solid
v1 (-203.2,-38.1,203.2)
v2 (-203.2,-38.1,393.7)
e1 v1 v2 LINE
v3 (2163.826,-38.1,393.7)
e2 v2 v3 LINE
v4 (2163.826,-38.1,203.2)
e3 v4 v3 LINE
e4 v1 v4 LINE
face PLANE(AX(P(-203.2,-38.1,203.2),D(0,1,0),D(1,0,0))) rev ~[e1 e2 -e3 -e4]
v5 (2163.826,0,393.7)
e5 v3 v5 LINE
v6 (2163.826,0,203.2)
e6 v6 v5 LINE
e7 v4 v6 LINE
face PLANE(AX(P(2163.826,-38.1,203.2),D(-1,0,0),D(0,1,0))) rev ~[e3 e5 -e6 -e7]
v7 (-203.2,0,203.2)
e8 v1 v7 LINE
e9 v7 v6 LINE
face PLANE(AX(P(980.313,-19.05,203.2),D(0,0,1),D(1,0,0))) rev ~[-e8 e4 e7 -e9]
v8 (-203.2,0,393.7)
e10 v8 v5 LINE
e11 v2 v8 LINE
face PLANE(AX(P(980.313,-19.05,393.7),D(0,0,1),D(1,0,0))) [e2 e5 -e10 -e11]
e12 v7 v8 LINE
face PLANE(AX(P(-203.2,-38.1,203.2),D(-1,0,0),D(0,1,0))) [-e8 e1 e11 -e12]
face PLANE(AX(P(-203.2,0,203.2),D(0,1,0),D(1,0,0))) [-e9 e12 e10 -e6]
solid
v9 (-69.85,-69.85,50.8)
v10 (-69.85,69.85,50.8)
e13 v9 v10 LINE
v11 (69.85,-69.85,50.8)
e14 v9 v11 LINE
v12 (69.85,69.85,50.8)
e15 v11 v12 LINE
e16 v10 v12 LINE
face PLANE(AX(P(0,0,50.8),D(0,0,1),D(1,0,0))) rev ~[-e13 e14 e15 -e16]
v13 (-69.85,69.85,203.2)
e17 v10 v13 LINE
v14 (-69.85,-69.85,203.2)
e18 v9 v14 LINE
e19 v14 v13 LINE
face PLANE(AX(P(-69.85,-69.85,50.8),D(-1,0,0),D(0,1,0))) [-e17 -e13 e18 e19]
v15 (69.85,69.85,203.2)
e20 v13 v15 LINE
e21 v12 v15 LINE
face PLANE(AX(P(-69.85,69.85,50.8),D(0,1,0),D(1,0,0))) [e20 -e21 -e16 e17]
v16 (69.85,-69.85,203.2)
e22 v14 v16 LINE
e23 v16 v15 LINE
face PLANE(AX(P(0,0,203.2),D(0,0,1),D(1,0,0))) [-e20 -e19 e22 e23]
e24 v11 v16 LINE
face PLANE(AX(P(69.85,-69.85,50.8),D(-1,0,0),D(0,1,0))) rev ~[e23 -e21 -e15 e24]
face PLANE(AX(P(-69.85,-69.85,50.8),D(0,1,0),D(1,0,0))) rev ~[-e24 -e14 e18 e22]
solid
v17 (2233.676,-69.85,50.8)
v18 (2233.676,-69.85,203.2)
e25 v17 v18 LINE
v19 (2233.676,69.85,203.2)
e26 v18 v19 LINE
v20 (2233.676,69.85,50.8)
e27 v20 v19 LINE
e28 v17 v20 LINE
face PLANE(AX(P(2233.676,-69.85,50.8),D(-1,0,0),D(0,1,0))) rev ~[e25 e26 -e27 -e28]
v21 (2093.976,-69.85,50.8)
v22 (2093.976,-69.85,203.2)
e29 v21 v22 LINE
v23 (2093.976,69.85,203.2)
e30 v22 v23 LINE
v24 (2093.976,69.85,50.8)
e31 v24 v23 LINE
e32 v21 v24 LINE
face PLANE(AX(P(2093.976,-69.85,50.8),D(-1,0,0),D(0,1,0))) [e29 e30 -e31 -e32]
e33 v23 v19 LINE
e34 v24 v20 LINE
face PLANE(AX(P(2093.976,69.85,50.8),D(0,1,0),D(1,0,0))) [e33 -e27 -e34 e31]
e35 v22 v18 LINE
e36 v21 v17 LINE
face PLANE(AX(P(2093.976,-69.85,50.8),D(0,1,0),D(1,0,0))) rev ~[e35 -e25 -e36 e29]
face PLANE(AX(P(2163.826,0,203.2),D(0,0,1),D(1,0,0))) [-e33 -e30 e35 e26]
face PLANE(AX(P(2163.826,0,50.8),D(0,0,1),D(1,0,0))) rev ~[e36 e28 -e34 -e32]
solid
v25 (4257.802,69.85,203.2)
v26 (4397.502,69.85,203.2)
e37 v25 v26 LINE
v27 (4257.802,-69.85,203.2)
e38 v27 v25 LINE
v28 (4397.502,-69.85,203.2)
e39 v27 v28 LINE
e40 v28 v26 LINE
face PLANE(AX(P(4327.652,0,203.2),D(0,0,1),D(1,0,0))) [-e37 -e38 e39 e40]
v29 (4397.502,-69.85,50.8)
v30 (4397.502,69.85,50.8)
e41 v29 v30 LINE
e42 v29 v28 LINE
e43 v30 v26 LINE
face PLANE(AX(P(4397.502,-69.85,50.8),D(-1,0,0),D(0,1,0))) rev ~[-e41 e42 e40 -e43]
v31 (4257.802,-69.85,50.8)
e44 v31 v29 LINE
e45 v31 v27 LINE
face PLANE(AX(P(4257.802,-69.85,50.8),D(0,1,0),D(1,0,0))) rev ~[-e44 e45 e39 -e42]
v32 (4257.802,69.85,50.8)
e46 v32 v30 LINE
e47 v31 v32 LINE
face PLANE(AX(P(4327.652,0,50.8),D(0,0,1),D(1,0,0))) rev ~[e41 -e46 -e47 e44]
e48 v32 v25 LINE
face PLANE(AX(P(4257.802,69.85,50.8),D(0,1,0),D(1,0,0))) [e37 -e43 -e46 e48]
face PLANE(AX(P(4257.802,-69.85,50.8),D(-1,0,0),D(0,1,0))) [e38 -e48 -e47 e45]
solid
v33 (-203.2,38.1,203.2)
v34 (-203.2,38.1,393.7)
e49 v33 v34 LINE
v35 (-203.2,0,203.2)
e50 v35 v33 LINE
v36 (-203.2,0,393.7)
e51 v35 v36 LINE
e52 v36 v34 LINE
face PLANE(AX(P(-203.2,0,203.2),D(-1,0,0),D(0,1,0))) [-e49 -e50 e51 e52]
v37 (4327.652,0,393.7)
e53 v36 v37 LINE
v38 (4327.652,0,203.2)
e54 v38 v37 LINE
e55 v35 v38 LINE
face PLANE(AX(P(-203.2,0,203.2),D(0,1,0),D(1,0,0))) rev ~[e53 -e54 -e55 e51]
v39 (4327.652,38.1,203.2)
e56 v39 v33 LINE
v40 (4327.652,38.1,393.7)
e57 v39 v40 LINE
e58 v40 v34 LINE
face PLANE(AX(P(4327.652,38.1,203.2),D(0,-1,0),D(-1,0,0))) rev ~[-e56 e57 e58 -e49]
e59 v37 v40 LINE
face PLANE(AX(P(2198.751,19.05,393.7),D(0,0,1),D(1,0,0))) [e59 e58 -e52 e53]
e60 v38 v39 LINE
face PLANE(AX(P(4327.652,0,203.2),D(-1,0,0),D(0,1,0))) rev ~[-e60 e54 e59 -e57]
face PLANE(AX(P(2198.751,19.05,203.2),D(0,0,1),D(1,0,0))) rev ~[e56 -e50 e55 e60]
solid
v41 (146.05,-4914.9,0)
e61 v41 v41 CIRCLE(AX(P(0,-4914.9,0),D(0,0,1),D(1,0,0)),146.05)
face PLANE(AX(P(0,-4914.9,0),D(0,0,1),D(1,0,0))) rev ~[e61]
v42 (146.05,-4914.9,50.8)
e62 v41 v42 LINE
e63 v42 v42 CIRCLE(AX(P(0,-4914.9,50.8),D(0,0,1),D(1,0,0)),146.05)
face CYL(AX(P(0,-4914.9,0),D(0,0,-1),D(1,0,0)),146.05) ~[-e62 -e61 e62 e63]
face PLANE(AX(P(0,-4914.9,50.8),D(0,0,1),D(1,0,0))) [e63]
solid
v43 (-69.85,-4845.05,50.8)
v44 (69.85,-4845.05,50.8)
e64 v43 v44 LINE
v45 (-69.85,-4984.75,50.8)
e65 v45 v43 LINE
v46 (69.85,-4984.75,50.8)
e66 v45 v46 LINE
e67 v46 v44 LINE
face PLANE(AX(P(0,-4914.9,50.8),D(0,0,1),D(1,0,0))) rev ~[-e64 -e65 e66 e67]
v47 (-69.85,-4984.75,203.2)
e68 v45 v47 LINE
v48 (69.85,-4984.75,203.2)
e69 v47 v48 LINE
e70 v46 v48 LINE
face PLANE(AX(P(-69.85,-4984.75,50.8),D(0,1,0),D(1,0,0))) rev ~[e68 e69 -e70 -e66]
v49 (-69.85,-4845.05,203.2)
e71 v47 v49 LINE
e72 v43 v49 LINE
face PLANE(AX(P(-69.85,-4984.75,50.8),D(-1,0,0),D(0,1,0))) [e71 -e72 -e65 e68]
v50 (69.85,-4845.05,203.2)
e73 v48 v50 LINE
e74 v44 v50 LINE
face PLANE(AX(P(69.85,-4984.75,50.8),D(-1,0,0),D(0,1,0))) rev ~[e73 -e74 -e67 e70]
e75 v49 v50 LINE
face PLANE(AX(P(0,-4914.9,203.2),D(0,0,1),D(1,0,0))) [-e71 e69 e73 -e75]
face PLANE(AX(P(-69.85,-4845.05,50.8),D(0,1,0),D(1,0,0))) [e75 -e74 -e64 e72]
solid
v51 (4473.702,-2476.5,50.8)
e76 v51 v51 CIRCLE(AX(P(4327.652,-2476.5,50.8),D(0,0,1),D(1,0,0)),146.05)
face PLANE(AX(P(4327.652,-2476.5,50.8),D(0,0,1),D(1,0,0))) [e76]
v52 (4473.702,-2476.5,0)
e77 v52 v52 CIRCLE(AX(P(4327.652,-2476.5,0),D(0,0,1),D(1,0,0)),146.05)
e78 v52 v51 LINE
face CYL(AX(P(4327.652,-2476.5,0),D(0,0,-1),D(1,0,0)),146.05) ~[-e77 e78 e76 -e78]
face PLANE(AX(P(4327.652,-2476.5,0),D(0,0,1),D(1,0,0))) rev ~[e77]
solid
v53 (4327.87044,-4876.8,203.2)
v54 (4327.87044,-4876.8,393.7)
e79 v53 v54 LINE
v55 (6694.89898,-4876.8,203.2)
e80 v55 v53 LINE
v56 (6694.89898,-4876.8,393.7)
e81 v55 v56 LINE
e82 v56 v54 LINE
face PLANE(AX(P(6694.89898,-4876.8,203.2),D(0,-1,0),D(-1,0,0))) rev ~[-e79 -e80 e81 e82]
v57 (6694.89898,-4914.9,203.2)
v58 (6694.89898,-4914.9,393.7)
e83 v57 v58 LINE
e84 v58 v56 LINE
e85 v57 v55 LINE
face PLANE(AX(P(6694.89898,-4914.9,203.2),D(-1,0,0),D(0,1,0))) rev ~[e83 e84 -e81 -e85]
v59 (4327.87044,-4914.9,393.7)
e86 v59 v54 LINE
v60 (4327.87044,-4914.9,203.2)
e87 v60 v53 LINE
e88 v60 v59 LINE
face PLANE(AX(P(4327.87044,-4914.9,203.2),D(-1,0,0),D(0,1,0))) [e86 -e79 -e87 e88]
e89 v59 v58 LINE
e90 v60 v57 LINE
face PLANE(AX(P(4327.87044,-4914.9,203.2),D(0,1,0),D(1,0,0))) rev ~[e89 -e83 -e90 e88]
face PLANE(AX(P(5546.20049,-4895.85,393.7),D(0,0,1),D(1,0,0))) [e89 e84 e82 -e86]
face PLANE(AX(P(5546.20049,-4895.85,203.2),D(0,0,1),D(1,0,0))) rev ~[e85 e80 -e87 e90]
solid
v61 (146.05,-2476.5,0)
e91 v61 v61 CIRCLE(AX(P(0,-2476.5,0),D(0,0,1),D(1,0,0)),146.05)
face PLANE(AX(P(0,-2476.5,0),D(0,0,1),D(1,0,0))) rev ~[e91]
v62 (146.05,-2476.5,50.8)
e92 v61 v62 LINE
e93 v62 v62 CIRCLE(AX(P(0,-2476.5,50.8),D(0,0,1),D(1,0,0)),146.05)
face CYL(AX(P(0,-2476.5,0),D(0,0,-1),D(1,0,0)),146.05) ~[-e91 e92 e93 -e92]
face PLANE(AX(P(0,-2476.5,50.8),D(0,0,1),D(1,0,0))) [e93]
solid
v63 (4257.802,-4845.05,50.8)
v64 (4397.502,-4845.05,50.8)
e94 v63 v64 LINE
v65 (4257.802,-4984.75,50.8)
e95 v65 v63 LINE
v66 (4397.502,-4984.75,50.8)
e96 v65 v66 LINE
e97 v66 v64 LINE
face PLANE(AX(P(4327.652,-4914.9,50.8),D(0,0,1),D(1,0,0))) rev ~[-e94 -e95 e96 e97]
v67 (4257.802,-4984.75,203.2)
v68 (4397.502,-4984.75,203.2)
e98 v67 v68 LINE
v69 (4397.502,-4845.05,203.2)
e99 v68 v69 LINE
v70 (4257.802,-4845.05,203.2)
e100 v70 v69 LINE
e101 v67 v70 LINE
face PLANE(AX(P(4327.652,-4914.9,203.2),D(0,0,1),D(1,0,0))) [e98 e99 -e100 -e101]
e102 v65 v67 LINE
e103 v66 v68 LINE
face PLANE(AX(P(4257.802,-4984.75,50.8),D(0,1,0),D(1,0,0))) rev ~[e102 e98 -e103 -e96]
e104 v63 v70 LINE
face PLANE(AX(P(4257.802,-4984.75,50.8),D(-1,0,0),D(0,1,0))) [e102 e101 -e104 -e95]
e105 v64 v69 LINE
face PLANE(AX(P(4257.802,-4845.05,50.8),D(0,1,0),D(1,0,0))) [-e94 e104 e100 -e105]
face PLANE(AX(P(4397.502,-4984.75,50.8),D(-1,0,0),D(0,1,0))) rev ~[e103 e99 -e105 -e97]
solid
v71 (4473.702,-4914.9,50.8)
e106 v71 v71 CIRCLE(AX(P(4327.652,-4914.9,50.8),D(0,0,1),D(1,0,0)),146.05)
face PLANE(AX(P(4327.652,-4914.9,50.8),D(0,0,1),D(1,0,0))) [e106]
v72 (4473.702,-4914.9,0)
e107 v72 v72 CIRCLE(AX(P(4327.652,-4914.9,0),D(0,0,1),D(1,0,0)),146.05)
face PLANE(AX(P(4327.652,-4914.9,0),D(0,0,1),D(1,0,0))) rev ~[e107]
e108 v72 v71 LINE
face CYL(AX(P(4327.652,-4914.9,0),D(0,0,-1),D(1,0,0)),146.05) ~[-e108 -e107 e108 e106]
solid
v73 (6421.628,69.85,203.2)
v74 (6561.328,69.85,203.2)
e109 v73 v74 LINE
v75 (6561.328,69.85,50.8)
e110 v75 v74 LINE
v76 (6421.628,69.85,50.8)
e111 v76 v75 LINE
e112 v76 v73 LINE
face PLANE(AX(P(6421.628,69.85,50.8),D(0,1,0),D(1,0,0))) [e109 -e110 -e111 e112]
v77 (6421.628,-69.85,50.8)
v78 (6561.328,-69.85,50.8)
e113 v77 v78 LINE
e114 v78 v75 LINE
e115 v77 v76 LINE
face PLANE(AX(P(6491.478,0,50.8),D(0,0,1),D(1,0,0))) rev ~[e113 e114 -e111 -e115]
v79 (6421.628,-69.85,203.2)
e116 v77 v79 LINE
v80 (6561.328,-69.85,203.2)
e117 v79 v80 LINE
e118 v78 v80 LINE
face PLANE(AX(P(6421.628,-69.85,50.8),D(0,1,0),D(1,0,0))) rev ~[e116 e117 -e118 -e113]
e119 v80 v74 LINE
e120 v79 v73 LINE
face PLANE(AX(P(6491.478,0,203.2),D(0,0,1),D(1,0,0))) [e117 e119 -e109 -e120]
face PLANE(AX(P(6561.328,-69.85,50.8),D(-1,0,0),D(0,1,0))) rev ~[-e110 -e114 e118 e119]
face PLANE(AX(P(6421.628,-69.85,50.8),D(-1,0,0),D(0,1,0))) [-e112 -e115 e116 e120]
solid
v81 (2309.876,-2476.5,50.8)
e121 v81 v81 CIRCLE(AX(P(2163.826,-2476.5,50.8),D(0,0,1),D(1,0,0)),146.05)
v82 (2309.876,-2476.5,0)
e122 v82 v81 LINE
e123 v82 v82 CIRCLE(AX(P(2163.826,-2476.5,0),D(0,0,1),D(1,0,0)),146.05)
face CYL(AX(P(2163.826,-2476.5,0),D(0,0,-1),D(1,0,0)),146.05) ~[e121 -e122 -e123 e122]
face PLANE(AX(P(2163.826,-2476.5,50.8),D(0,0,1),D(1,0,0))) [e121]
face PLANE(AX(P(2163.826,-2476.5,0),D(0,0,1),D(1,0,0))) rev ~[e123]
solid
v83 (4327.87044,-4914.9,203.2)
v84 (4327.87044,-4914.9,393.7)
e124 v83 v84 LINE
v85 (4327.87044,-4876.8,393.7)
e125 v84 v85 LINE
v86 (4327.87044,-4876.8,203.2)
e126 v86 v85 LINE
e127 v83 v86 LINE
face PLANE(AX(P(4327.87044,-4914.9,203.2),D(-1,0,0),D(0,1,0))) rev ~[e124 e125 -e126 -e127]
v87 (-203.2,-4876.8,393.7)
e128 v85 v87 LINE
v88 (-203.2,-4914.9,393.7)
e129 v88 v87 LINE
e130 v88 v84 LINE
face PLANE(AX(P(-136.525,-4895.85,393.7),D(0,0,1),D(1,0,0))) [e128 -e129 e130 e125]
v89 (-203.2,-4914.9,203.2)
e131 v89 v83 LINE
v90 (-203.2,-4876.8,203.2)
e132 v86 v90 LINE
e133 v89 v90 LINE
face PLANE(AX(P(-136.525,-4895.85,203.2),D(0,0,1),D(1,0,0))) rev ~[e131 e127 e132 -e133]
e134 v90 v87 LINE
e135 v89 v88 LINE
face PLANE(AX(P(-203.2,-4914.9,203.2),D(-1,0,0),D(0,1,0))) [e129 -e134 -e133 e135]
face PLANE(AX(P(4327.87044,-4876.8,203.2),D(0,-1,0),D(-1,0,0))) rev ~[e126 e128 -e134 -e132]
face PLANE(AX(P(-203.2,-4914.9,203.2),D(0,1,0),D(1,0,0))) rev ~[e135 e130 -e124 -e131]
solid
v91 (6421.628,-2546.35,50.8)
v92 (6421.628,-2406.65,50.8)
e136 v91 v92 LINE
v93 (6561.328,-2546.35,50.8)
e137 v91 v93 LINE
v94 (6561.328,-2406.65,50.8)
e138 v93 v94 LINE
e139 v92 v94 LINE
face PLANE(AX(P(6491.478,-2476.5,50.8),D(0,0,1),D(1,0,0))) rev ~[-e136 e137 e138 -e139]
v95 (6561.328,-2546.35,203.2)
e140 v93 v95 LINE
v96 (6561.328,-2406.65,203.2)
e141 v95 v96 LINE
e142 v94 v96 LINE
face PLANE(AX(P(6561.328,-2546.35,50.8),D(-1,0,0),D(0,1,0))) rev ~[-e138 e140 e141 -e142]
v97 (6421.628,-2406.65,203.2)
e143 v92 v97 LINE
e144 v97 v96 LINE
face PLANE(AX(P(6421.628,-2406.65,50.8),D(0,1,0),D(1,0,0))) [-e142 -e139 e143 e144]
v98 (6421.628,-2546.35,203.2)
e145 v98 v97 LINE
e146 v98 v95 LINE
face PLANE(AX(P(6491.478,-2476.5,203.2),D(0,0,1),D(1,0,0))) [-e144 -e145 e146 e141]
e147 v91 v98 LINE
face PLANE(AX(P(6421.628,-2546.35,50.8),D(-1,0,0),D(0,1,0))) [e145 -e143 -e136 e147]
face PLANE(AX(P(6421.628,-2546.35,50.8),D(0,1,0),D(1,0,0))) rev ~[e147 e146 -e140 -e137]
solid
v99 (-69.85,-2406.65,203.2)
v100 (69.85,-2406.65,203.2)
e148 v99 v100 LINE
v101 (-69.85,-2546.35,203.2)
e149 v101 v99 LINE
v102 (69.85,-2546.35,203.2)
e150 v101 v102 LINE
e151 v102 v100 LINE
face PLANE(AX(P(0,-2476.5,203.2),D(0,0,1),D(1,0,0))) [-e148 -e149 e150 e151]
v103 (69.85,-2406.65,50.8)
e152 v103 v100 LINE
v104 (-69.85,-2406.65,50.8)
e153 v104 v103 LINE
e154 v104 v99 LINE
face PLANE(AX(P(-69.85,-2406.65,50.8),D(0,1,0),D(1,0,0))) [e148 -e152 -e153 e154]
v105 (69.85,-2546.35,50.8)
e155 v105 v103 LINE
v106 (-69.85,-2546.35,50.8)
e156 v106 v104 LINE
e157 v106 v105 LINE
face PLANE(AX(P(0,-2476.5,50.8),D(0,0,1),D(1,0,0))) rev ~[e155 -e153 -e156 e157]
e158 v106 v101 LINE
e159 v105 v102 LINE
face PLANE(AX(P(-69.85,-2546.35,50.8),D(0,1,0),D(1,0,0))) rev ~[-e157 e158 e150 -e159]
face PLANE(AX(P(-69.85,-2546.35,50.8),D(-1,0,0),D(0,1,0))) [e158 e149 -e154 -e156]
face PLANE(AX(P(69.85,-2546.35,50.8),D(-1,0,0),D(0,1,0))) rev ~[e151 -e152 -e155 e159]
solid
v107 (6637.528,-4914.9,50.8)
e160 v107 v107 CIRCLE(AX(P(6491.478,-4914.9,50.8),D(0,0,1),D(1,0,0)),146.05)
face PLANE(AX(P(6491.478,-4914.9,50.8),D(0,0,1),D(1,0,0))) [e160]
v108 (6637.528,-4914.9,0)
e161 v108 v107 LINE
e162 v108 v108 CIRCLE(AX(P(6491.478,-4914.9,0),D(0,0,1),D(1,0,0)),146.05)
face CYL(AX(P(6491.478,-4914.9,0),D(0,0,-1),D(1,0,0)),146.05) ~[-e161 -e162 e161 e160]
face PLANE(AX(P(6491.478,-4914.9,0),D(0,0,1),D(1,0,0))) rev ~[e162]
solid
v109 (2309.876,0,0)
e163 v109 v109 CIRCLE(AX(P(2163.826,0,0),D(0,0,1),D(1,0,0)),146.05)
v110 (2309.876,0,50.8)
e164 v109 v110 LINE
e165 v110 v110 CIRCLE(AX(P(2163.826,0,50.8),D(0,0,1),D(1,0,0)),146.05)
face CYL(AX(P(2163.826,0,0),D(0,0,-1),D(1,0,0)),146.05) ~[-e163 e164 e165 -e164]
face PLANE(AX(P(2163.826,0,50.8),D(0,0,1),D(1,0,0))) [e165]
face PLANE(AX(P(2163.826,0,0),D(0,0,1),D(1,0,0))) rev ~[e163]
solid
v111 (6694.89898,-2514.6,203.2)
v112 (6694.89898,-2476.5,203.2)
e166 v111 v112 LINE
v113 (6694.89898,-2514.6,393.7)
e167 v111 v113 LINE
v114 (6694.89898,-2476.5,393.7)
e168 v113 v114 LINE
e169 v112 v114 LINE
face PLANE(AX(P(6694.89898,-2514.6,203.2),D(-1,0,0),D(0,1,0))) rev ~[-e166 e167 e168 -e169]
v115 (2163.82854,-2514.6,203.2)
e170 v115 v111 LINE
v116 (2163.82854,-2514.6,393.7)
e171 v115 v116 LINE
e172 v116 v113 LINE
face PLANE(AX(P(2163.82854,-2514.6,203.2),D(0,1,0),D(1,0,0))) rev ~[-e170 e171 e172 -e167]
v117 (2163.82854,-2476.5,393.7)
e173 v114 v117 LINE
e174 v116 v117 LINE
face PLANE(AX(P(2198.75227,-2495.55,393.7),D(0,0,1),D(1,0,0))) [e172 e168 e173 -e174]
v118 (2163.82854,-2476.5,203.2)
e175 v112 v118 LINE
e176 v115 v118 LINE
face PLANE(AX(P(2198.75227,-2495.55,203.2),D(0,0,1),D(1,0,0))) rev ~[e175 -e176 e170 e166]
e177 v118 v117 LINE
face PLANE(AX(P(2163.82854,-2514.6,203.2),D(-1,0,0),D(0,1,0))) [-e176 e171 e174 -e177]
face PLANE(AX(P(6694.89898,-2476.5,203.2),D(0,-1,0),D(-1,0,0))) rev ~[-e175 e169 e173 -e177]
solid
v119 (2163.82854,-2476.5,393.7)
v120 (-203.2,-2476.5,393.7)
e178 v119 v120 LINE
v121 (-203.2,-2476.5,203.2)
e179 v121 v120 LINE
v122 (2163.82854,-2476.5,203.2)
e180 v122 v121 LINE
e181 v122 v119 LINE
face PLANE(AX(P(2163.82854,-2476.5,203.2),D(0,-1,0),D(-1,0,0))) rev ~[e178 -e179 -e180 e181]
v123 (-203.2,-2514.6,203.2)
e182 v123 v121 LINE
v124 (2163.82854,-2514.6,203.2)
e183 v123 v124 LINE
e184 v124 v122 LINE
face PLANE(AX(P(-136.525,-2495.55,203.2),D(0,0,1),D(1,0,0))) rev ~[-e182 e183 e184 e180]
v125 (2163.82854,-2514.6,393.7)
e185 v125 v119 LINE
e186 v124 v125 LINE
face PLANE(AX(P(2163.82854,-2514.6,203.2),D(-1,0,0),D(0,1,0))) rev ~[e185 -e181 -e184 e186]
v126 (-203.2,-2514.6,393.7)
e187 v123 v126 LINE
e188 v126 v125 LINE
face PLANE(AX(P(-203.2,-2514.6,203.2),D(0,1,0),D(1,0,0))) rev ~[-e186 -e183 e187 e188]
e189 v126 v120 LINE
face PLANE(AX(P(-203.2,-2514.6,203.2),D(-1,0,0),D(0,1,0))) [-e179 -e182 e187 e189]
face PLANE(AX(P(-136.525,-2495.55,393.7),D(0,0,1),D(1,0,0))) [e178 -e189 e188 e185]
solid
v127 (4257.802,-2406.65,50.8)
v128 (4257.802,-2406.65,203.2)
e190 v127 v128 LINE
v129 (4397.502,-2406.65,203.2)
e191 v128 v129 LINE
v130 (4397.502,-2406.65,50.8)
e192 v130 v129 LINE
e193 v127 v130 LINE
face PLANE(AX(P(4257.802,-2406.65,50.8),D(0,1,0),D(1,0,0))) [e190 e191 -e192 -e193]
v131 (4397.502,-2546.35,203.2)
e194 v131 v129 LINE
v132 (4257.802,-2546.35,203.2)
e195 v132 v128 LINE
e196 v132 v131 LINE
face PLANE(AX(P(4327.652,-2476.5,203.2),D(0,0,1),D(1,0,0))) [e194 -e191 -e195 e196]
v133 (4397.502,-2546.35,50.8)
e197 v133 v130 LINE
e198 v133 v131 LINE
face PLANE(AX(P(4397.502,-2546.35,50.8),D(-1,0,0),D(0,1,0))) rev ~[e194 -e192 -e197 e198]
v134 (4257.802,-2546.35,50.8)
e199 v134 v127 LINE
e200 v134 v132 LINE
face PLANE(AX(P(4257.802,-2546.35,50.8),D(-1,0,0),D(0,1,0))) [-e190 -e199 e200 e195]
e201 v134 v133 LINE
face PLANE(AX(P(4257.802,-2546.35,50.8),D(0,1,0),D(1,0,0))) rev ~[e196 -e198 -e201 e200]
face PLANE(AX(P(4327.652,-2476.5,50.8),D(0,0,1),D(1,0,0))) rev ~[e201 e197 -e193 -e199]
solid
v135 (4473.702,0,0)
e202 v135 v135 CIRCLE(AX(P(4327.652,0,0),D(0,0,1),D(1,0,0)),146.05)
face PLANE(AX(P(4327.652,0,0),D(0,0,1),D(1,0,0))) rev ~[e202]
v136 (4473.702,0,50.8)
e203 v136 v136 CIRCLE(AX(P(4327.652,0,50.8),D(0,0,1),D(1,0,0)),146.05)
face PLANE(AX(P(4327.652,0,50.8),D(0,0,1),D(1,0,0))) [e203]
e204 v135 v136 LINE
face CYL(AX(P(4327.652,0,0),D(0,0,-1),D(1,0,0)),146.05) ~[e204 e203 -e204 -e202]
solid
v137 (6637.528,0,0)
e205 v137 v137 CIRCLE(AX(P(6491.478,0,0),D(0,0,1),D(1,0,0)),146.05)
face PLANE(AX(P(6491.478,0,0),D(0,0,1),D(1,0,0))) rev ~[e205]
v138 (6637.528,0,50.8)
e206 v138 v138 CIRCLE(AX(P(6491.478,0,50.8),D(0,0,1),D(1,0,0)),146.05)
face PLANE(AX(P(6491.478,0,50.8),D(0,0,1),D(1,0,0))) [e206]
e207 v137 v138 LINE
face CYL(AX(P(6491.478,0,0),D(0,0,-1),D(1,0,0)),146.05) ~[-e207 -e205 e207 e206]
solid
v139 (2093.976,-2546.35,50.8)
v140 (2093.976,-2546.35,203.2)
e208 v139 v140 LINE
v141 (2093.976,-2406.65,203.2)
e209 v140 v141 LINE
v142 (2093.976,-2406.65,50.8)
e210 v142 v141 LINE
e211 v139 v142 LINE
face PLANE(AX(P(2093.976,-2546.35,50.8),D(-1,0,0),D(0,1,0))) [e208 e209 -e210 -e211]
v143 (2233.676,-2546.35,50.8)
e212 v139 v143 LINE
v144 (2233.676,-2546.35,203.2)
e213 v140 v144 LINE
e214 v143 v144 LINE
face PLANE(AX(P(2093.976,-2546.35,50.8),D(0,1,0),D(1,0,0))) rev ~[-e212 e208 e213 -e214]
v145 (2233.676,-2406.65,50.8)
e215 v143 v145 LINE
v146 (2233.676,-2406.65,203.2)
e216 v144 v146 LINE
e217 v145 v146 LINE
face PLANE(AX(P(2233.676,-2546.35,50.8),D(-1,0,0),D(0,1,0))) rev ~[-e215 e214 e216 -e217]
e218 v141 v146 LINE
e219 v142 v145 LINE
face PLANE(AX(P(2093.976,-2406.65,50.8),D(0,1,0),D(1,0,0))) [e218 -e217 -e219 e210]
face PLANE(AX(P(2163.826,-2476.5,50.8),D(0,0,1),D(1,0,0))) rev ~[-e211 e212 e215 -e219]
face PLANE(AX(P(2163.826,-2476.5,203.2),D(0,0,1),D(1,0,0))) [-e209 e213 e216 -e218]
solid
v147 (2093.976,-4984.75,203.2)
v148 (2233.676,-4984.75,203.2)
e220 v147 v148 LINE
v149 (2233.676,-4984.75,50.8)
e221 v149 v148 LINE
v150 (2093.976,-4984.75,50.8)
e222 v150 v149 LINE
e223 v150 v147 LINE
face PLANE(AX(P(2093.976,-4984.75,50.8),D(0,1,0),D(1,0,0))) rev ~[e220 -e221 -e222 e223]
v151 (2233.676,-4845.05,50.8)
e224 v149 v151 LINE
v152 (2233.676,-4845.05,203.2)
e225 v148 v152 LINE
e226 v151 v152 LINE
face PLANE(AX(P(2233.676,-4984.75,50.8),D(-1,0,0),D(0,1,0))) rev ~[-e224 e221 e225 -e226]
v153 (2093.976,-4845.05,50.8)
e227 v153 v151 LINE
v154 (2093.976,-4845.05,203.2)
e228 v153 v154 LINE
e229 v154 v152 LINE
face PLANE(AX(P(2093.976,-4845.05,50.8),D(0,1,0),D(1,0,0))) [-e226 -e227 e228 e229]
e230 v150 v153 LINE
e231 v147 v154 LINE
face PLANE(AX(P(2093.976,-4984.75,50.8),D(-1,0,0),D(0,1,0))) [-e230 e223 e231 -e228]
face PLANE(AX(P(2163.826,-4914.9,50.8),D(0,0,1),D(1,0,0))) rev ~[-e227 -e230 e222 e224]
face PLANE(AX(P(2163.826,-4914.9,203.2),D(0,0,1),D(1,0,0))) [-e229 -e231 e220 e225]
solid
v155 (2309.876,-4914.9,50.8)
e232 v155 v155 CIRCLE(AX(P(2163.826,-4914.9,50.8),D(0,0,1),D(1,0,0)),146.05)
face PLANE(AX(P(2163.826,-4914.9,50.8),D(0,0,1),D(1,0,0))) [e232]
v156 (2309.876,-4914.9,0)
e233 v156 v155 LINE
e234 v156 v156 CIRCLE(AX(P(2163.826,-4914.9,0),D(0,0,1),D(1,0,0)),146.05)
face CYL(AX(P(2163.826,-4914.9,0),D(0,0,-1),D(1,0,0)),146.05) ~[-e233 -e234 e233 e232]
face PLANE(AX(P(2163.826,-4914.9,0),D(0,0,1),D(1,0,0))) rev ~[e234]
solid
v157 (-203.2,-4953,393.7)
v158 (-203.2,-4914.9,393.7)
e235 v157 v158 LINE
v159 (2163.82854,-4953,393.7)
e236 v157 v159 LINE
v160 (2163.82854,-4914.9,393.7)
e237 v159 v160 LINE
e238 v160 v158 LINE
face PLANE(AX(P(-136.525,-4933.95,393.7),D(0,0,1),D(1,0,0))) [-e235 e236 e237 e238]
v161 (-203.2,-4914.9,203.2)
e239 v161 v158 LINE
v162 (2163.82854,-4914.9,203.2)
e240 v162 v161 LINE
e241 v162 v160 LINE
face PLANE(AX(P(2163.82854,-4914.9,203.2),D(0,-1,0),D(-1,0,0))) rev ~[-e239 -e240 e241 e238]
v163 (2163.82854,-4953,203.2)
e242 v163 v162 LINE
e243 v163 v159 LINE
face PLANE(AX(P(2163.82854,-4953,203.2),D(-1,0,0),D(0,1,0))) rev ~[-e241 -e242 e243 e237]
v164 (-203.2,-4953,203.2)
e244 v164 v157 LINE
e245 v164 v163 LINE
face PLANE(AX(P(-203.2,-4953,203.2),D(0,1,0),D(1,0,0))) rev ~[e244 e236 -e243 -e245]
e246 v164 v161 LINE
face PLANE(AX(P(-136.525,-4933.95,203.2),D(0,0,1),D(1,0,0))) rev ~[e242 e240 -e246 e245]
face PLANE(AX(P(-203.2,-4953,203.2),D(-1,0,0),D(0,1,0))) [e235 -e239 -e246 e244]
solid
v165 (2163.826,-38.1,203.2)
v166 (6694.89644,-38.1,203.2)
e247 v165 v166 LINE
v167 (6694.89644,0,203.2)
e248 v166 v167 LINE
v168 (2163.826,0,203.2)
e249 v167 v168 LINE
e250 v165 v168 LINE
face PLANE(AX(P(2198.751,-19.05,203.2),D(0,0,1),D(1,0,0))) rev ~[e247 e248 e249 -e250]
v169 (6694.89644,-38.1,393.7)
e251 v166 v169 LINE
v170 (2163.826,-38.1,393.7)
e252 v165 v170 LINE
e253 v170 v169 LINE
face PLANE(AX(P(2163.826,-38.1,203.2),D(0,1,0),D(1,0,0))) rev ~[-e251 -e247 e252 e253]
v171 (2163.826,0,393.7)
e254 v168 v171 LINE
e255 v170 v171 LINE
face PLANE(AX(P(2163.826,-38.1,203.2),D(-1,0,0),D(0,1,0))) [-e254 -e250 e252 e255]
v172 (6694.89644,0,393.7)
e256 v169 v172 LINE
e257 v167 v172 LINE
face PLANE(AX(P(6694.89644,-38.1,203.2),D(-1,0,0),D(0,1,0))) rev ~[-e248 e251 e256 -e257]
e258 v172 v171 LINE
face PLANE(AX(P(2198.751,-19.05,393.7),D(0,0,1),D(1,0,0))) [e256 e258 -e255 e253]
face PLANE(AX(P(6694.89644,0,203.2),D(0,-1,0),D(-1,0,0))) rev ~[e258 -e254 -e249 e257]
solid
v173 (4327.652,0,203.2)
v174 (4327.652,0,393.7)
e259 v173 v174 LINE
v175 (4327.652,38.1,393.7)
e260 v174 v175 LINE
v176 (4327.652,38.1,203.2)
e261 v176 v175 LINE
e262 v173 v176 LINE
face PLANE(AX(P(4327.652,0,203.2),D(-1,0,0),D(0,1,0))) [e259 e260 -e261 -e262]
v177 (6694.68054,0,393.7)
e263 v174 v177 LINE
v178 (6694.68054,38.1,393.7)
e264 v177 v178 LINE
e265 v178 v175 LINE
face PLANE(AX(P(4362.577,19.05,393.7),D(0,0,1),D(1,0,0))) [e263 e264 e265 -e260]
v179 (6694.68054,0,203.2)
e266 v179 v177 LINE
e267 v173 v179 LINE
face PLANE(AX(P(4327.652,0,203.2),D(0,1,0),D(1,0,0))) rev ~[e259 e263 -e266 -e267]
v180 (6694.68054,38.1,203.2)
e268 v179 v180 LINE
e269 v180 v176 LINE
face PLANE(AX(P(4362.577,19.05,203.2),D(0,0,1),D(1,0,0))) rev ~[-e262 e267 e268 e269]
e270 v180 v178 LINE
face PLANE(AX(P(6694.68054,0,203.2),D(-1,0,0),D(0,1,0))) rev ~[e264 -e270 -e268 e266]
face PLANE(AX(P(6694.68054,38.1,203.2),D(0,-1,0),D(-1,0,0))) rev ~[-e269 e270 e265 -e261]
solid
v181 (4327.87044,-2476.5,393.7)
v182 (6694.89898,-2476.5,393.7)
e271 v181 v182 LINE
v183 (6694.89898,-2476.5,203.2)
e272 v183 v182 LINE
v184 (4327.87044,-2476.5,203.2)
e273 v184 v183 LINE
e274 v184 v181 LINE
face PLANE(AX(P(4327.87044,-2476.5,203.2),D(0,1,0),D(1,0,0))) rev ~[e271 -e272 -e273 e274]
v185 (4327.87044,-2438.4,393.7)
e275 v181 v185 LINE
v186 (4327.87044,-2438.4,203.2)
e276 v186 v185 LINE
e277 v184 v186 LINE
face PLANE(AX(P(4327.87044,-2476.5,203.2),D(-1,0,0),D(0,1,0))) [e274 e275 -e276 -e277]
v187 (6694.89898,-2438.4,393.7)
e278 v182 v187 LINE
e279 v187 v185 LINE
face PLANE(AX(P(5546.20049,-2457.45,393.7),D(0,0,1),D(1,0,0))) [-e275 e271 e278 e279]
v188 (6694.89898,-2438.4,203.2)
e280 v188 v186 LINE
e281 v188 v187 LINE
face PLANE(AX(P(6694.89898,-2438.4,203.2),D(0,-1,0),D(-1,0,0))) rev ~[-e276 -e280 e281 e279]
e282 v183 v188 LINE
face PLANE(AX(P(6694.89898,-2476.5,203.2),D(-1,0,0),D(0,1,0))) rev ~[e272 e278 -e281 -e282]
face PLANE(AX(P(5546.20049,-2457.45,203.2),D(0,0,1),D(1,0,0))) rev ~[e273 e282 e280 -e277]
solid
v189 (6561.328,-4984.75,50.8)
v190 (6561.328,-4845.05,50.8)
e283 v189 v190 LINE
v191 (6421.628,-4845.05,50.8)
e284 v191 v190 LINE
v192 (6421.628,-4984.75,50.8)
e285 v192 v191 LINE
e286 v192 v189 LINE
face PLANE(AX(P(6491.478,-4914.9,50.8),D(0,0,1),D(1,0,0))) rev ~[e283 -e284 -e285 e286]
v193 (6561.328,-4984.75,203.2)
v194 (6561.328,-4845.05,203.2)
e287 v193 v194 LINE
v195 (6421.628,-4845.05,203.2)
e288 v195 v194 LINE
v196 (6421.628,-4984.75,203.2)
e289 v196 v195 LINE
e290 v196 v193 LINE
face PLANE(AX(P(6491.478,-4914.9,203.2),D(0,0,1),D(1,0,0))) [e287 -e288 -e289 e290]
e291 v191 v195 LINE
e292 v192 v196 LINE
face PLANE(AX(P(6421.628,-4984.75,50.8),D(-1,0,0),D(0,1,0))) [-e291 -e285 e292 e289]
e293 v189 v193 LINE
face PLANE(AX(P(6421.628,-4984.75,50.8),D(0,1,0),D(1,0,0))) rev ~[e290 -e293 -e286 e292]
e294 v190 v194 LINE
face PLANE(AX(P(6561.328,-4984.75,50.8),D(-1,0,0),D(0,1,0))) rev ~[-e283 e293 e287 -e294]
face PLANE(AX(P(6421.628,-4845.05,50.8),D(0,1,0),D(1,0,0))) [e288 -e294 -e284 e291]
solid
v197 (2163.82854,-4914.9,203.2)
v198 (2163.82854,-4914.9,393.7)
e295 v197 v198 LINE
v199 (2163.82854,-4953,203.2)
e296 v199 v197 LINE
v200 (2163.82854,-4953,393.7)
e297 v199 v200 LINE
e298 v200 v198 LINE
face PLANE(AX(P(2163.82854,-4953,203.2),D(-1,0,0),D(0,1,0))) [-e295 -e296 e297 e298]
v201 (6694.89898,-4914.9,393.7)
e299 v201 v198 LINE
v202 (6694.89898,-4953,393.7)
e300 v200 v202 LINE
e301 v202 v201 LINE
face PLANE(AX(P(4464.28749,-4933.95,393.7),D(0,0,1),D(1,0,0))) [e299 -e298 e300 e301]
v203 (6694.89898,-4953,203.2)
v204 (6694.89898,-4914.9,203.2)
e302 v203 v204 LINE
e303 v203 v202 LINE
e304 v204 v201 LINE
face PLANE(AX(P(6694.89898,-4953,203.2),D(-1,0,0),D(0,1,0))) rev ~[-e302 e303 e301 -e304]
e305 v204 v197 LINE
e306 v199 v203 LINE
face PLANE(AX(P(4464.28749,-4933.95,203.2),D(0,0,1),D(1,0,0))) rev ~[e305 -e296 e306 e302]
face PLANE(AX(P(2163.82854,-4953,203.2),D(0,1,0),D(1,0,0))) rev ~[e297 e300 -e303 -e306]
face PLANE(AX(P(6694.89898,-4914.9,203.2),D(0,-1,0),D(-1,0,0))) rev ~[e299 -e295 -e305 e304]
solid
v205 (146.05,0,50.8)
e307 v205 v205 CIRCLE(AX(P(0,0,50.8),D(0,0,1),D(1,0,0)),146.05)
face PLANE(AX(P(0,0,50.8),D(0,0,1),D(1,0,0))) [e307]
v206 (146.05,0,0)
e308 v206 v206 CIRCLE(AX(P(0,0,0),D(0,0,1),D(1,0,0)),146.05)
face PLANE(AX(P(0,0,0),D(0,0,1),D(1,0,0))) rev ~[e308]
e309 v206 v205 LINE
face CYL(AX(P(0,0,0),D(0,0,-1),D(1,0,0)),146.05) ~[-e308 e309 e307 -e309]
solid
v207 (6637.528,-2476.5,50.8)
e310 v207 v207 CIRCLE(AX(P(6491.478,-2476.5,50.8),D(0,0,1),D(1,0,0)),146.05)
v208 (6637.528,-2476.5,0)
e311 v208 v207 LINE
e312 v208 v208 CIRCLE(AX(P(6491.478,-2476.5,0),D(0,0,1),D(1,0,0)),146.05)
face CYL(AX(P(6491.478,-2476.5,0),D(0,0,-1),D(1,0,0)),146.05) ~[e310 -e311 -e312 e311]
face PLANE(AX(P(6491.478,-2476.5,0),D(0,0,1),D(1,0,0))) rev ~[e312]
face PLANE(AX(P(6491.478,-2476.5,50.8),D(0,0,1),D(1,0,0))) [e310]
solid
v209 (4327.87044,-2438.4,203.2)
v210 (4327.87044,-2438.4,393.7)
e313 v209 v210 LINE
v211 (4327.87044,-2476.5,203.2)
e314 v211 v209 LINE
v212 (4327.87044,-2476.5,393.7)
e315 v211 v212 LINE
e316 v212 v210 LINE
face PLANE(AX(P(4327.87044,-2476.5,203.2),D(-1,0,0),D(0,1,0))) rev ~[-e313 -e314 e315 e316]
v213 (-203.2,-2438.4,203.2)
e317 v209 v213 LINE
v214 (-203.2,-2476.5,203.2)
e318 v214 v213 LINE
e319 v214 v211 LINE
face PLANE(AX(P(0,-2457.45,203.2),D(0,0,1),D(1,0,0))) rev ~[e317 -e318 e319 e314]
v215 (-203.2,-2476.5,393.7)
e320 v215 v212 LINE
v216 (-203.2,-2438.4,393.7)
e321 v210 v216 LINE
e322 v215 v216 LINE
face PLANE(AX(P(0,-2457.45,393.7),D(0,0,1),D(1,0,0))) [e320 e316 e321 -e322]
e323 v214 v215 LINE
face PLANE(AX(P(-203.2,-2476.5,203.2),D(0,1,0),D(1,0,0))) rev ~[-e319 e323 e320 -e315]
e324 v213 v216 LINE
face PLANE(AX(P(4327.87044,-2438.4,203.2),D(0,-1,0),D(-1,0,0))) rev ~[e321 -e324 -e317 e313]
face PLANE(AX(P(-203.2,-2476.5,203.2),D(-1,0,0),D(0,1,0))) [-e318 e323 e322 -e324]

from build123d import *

# Parameters (mm, degrees)
F0_R      = 146.05
F1_DEPTH  = 50.8
F2_W      = 139.7
F2_H      = 139.7
F3_DEPTH  = 152.4
F4_W      = 2367.026
F4_H      = 38.1
F5_DEPTH  = 190.5
F6_W      = 4257.802
F6_H      = 38.1
F6_W_2    = 139.7
F6_W_3    = 133.35
F7_DEPTH  = 190.5
F8_W      = 139.7
F8_H      = 38.1
F8_W_2    = 133.35
F8_W_3    = 4258.02044
F9_DEPTH  = 190.5
F10_W     = 69.85
F10_H     = 38.1
F10_W_2   = 2297.17854
F11_DEPTH = 190.5
F12_W     = 69.85
F12_H     = 38.1
F12_W_2   = 4461.22044
F13_DEPTH = 190.5
F14_W     = 133.35
F14_H     = 38.1
F14_W_2   = 139.7
F14_W_3   = 4258.02044
F15_DEPTH = 190.5
F16_W     = 133.35
F16_H     = 38.1
F16_W_2   = 139.7
F16_W_3   = 2093.97854
F17_DEPTH = 190.5
F18_W     = 133.35
F18_H     = 38.1
F18_W_2   = 139.7
F18_W_3   = 2093.97854
F19_DEPTH = 190.5
F20_W     = 69.84746
F20_H     = 38.1
F20_W_2   = 4461.22298
F21_DEPTH = 190.5
F22_W     = 4461.22298
F22_H     = 38.1
F22_W_2   = 69.84746
F23_DEPTH = 190.5
F24_W     = 2297.39698
F24_H     = 38.1
F24_W_2   = 69.63156
F25_DEPTH = 190.5
F26_W     = 2297.39698
F26_H     = 38.1
F26_W_2   = 69.63156
F27_DEPTH = 190.5


with BuildPart() as f1:
    # F0 (on Top) → F1 (new body)
    with BuildSketch(Plane.XY):
        with Locations((6491.478, 0)):
            Circle(F0_R)
    extrude(amount=F1_DEPTH)


with BuildPart() as f1b:
    # F0 (on Top) → F1, piece 2 (new body)
    with BuildSketch(Plane.XY):
        with Locations((6491.478, -4914.9)):
            Circle(F0_R)
    extrude(amount=F1_DEPTH)


with BuildPart() as f1c:
    # F0 (on Top) → F1, piece 3 (new body)
    with BuildSketch(Plane.XY):
        with Locations((2163.826, -2476.5)):
            Circle(F0_R)
    extrude(amount=F1_DEPTH)


with BuildPart() as f1d:
    # F0 (on Top) → F1, piece 4 (new body)
    with BuildSketch(Plane.XY):
        with Locations((2163.826, -4914.9)):
            Circle(F0_R)
    extrude(amount=F1_DEPTH)


with BuildPart() as f1e:
    # F0 (on Top) → F1, piece 5 (new body)
    with BuildSketch(Plane.XY):
        with Locations((0, -2476.5)):
            Circle(F0_R)
    extrude(amount=F1_DEPTH)


with BuildPart() as f1f:
    # F0 (on Top) → F1, piece 6 (new body)
    with BuildSketch(Plane.XY):
        with Locations((2163.826, 0)):
            Circle(F0_R)
    extrude(amount=F1_DEPTH)


with BuildPart() as f1g:
    # F0 (on Top) → F1, piece 7 (new body)
    with BuildSketch(Plane.XY):
        with Locations((4327.652, -4914.9)):
            Circle(F0_R)
    extrude(amount=F1_DEPTH)


with BuildPart() as f1h:
    # F0 (on Top) → F1, piece 8 (new body)
    with BuildSketch(Plane.XY):
        Circle(F0_R)
    extrude(amount=F1_DEPTH)


with BuildPart() as f1i:
    # F0 (on Top) → F1, piece 9 (new body)
    with BuildSketch(Plane.XY):
        with Locations((4327.652, 0)):
            Circle(F0_R)
    extrude(amount=F1_DEPTH)


with BuildPart() as f1j:
    # F0 (on Top) → F1, piece 10 (new body)
    with BuildSketch(Plane.XY):
        with Locations((4327.652, -2476.5)):
            Circle(F0_R)
    extrude(amount=F1_DEPTH)


with BuildPart() as f1k:
    # F0 (on Top) → F1, piece 11 (new body)
    with BuildSketch(Plane.XY):
        with Locations((6491.478, -2476.5)):
            Circle(F0_R)
    extrude(amount=F1_DEPTH)


with BuildPart() as f1l:
    # F0 (on Top) → F1, piece 12 (new body)
    with BuildSketch(Plane.XY):
        with Locations((0, -4914.9)):
            Circle(F0_R)
    extrude(amount=F1_DEPTH)


with BuildPart() as f3:
    # F2 (on face) → F3 (new body)
    with BuildSketch(Plane.XY.offset(50.8)):
        Rectangle(F2_W, F2_H)
    extrude(amount=F3_DEPTH)


with BuildPart() as f3b:
    # F2 (on face) → F3, piece 2 (new body)
    with BuildSketch(Plane.XY.offset(50.8)):
        with Locations((2163.826, 0)):
            Rectangle(F2_W, F2_H)
    extrude(amount=F3_DEPTH)


with BuildPart() as f3c:
    # F2 (on face) → F3, piece 3 (new body)
    with BuildSketch(Plane.XY.offset(50.8)):
        with Locations((4327.652, 0)):
            Rectangle(F2_W, F2_H)
    extrude(amount=F3_DEPTH)


with BuildPart() as f3d:
    # F2 (on face) → F3, piece 4 (new body)
    with BuildSketch(Plane.XY.offset(50.8)):
        with Locations((6491.478, 0)):
            Rectangle(F2_W, F2_H)
    extrude(amount=F3_DEPTH)


with BuildPart() as f3e:
    # F2 (on face) → F3, piece 5 (new body)
    with BuildSketch(Plane.XY.offset(50.8)):
        with Locations((0, -2476.5)):
            Rectangle(F2_W, F2_H)
    extrude(amount=F3_DEPTH)


with BuildPart() as f3f:
    # F2 (on face) → F3, piece 6 (new body)
    with BuildSketch(Plane.XY.offset(50.8)):
        with Locations((2163.826, -2476.5)):
            Rectangle(F2_W, F2_H)
    extrude(amount=F3_DEPTH)


with BuildPart() as f3g:
    # F2 (on face) → F3, piece 7 (new body)
    with BuildSketch(Plane.XY.offset(50.8)):
        with Locations((4327.652, -2476.5)):
            Rectangle(F2_W, F2_H)
    extrude(amount=F3_DEPTH)


with BuildPart() as f3h:
    # F2 (on face) → F3, piece 8 (new body)
    with BuildSketch(Plane.XY.offset(50.8)):
        with Locations((6491.478, -2476.5)):
            Rectangle(F2_W, F2_H)
    extrude(amount=F3_DEPTH)


with BuildPart() as f3i:
    # F2 (on face) → F3, piece 9 (new body)
    with BuildSketch(Plane.XY.offset(50.8)):
        with Locations((0, -4914.9)):
            Rectangle(F2_W, F2_H)
    extrude(amount=F3_DEPTH)


with BuildPart() as f3j:
    # F2 (on face) → F3, piece 10 (new body)
    with BuildSketch(Plane.XY.offset(50.8)):
        with Locations((2163.826, -4914.9)):
            Rectangle(F2_W, F2_H)
    extrude(amount=F3_DEPTH)


with BuildPart() as f3k:
    # F2 (on face) → F3, piece 11 (new body)
    with BuildSketch(Plane.XY.offset(50.8)):
        with Locations((4327.652, -4914.9)):
            Rectangle(F2_W, F2_H)
    extrude(amount=F3_DEPTH)


with BuildPart() as f3l:
    # F2 (on face) → F3, piece 12 (new body)
    with BuildSketch(Plane.XY.offset(50.8)):
        with Locations((6491.478, -4914.9)):
            Rectangle(F2_W, F2_H)
    extrude(amount=F3_DEPTH)


with BuildPart() as f5:
    # F4 (on face) → F5 (new body)
    with BuildSketch(Plane.XY.offset(203.2)):
        with Locations((980.313, -19.05)):
            Rectangle(F4_W, F4_H)
    extrude(amount=F5_DEPTH)


with BuildPart() as f7:
    # F6 (on face) → F7 (new body)
    with BuildSketch(Plane.XY.offset(203.2)):
        with Locations((2198.751, 19.05)):
            Rectangle(F6_W, F6_H)
        with Locations((0, 19.05)):
            Rectangle(F6_W_2, F6_H)
        with Locations((-136.525, 19.05)):
            Rectangle(F6_W_3, F6_H)
    extrude(amount=F7_DEPTH)


with BuildPart() as f9:
    # F8 (on face) → F9 (new body)
    with BuildSketch(Plane.XY.offset(203.2)):
        with Locations((0, -2457.45)):
            Rectangle(F8_W, F8_H)
        with Locations((-136.525, -2457.45)):
            Rectangle(F8_W_2, F8_H)
        with Locations((2198.86022, -2457.45)):
            Rectangle(F8_W_3, F8_H)
    extrude(amount=F9_DEPTH)


with BuildPart() as f11:
    # F10 (on face) → F11 (new body)
    with BuildSketch(Plane.XY.offset(203.2)):
        with Locations((4362.577, 19.05)):
            Rectangle(F10_W, F10_H)
        with Locations((5546.09127, 19.05)):
            Rectangle(F10_W_2, F10_H)
    extrude(amount=F11_DEPTH)


with BuildPart() as f13:
    # F12 (on face) → F13 (new body)
    with BuildSketch(Plane.XY.offset(203.2)):
        with Locations((2198.751, -19.05)):
            Rectangle(F12_W, F12_H)
        with Locations((4464.28622, -19.05)):
            Rectangle(F12_W_2, F12_H)
    extrude(amount=F13_DEPTH)


with BuildPart() as f15:
    # F14 (on face) → F15 (new body)
    with BuildSketch(Plane.XY.offset(203.2)):
        with Locations((-136.525, -4895.85)):
            Rectangle(F14_W, F14_H)
        with Locations((0, -4895.85)):
            Rectangle(F14_W_2, F14_H)
        with Locations((2198.86022, -4895.85)):
            Rectangle(F14_W_3, F14_H)
    extrude(amount=F15_DEPTH)


with BuildPart() as f17:
    # F16 (on face) → F17 (new body)
    with BuildSketch(Plane.XY.offset(203.2)):
        with Locations((-136.525, -2495.55)):
            Rectangle(F16_W, F16_H)
        with Locations((0, -2495.55)):
            Rectangle(F16_W_2, F16_H)
        with Locations((1116.83927, -2495.55)):
            Rectangle(F16_W_3, F16_H)
    extrude(amount=F17_DEPTH)


with BuildPart() as f19:
    # F18 (on face) → F19 (new body)
    with BuildSketch(Plane.XY.offset(203.2)):
        with Locations((-136.525, -4933.95)):
            Rectangle(F18_W, F18_H)
        with Locations((0, -4933.95)):
            Rectangle(F18_W_2, F18_H)
        with Locations((1116.83927, -4933.95)):
            Rectangle(F18_W_3, F18_H)
    extrude(amount=F19_DEPTH)


with BuildPart() as f21:
    # F20 (on face) → F21 (new body)
    with BuildSketch(Plane.XY.offset(203.2)):
        with Locations((2198.75227, -2495.55)):
            Rectangle(F20_W, F20_H)
        with Locations((4464.28749, -2495.55)):
            Rectangle(F20_W_2, F20_H)
    extrude(amount=F21_DEPTH)


with BuildPart() as f23:
    # F22 (on face) → F23 (new body)
    with BuildSketch(Plane.XY.offset(203.2)):
        with Locations((4464.28749, -4933.95)):
            Rectangle(F22_W, F22_H)
        with Locations((2198.75227, -4933.95)):
            Rectangle(F22_W_2, F22_H)
    extrude(amount=F23_DEPTH)


with BuildPart() as f25:
    # F24 (on face) → F25 (new body)
    with BuildSketch(Plane.XY.offset(203.2)):
        with Locations((5546.20049, -2457.45)):
            Rectangle(F24_W, F24_H)
        with Locations((4362.68622, -2457.45)):
            Rectangle(F24_W_2, F24_H)
    extrude(amount=F25_DEPTH)


with BuildPart() as f27:
    # F26 (on face) → F27 (new body)
    with BuildSketch(Plane.XY.offset(203.2)):
        with Locations((5546.20049, -4895.85)):
            Rectangle(F26_W, F26_H)
        with Locations((4362.68622, -4895.85)):
            Rectangle(F26_W_2, F26_H)
    extrude(amount=F27_DEPTH)


solid = Compound([f1.part, f1b.part, f1c.part, f1d.part, f1e.part, f1f.part, f1g.part, f1h.part, f1i.part, f1j.part, f1k.part, f1l.part, f3.part, f3b.part, f3c.part, f3d.part, f3e.part, f3f.part, f3g.part, f3h.part, f3i.part, f3j.part, f3k.part, f3l.part, f5.part, f7.part, f9.part, f11.part, f13.part, f15.part, f17.part, f19.part, f21.part, f23.part, f25.part, f27.part])
